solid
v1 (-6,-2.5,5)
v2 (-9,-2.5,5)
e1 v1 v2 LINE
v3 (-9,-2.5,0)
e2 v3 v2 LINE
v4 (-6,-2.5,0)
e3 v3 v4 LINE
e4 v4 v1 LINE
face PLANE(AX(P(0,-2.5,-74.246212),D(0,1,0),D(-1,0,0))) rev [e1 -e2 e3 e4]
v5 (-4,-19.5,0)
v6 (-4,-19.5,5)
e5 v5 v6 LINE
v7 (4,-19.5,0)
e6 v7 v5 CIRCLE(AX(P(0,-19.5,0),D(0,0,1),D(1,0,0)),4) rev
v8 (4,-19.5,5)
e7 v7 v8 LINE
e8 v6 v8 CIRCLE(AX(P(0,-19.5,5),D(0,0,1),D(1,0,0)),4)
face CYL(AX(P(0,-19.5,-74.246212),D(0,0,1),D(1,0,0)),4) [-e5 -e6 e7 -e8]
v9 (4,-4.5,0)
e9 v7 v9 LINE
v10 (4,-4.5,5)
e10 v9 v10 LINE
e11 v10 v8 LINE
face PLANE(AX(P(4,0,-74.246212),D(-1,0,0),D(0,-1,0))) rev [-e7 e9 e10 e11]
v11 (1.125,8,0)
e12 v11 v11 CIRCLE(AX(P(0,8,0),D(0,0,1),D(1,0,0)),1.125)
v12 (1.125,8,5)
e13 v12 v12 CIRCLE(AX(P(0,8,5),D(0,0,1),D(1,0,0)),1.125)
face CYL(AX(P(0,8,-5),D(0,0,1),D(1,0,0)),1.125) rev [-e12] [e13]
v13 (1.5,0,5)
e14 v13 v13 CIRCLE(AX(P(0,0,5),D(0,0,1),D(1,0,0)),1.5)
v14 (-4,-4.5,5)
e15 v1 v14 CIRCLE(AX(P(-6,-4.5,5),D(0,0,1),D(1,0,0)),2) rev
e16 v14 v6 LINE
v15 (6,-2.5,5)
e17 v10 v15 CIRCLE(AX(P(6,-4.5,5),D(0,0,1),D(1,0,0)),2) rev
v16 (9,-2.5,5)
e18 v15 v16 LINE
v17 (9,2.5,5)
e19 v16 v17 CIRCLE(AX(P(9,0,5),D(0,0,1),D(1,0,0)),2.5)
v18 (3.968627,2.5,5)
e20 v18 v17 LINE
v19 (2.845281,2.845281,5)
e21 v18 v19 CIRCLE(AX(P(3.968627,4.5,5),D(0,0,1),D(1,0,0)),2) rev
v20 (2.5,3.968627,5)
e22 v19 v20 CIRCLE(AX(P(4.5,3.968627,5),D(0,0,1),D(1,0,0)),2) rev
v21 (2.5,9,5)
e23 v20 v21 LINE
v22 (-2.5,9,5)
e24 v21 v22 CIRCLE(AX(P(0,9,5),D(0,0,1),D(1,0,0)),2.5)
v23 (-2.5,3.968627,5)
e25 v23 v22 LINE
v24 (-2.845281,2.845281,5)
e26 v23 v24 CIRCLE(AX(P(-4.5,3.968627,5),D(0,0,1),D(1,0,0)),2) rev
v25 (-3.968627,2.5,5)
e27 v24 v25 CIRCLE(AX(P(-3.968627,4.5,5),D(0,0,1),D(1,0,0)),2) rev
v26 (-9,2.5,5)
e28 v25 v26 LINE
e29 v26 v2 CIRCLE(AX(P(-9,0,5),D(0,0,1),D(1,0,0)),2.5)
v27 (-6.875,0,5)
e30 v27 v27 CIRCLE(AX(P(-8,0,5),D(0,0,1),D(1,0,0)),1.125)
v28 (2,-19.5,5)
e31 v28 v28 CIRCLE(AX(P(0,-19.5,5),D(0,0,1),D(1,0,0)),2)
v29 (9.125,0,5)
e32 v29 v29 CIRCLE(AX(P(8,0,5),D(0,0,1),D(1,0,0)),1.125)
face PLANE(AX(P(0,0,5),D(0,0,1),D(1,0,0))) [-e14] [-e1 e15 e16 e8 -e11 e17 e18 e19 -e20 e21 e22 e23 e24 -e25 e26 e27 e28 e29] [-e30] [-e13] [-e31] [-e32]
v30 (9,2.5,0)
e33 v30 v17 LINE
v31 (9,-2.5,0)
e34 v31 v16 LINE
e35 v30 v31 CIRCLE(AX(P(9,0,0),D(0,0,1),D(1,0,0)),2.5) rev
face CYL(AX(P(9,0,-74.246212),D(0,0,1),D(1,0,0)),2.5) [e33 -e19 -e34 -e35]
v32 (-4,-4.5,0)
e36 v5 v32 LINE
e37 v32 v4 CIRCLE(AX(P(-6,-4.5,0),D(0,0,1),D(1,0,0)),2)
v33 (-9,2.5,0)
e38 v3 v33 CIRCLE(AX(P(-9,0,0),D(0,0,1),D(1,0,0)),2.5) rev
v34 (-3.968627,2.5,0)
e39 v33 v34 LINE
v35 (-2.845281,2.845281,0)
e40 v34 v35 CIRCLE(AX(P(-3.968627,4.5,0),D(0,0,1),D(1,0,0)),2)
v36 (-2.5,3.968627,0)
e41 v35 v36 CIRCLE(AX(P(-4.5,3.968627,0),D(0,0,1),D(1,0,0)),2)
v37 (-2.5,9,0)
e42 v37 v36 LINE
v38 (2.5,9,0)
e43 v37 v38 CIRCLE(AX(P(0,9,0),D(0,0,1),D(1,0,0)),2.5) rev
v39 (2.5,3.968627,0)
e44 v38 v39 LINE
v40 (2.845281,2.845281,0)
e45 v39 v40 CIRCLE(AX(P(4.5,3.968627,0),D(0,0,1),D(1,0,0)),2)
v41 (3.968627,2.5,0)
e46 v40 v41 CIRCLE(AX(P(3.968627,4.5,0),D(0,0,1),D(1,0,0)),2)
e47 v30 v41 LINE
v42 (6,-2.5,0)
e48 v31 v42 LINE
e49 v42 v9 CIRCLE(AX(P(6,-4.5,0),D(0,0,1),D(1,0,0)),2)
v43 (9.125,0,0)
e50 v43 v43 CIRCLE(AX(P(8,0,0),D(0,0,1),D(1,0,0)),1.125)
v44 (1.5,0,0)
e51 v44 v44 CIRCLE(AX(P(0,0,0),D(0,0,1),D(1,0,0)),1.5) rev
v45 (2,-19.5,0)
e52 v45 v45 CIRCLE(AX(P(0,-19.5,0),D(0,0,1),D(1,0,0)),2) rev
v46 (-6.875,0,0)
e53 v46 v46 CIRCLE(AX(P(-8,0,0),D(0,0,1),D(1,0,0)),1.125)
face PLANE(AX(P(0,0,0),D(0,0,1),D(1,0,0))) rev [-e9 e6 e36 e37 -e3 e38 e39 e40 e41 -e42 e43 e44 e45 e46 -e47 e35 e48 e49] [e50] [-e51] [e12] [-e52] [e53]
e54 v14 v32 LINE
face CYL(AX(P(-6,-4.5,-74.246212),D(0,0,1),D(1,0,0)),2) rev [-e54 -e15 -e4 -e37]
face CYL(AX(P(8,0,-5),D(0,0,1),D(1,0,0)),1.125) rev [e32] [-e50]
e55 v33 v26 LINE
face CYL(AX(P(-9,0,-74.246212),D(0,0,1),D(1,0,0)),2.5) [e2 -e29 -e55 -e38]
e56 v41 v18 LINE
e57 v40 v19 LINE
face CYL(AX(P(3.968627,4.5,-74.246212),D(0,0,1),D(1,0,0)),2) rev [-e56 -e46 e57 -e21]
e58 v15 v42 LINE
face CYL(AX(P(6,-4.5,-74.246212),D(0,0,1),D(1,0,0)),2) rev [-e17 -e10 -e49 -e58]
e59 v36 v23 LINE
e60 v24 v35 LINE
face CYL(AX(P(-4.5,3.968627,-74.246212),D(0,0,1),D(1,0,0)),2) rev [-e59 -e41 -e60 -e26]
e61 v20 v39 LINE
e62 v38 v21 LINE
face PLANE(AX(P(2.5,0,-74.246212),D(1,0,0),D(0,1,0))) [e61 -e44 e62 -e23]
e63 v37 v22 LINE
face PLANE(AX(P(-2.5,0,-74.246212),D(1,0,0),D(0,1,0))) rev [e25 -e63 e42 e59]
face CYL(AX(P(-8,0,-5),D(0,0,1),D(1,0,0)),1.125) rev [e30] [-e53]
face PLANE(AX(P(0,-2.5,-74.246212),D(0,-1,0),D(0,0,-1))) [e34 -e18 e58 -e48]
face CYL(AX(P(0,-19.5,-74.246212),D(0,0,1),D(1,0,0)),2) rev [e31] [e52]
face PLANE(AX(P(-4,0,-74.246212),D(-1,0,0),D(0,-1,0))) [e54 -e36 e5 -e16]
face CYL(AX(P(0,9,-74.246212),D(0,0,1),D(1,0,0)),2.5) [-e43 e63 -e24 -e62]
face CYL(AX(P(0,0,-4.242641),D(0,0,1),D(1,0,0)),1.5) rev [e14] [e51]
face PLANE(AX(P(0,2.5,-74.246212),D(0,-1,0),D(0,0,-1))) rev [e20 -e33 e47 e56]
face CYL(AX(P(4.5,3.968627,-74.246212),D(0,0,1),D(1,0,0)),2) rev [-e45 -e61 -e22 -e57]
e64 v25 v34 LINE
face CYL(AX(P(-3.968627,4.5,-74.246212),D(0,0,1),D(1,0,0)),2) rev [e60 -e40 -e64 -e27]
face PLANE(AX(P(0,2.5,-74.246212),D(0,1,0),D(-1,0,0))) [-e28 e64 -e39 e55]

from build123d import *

# Parameters (mm, degrees)
ESQUISSE1_R             = 26.25
BOSS_EXTRU_1_DEPTH      = 5
ESQUISSE2_R             = 1.5
ENL_V_MAT_EXTRU_1_DEPTH = 5
ENL_V_START             = -5
ESQUISSE3_R             = 26.25
ESQUISSE3_R_2           = 2
ENL_V_MAT_EXTRU_2_DEPTH = 5
CONG_1_R                = 2
ESQUISSE4_R             = 1.125
ENL_V_MAT_EXTRU_3_DEPTH = 10


with BuildPart() as part:
    # Esquisse1 → Boss.-Extru.1 (new body)
    with BuildSketch(Plane.XY):
        Circle(ESQUISSE1_R)
    extrude(amount=BOSS_EXTRU_1_DEPTH)

    # Esquisse2 → Enlèv. mat.-Extru.1 (cut)
    with BuildSketch(Plane.XY.offset(5)):
        Circle(ESQUISSE2_R)
    extrude(amount=-ENL_V_MAT_EXTRU_1_DEPTH, mode=Mode.SUBTRACT)

    # Esquisse3 → Enlèv. mat.-Extru.2 (cut)
    # profile 1 of 2: a face of its own
    with BuildSketch(Plane.XY.offset(5).offset(ENL_V_START)):
        Circle(ESQUISSE3_R)
        with BuildLine():
            Line((9, -2.5), (4, -2.5))
            Line((4, -2.5), (4, -19.5))
            ThreePointArc((4, -19.5), (0, -23.5), (-4, -19.5))
            Line((-4, -19.5), (-4, -2.5))
            Line((-4, -2.5), (-9, -2.5))
            ThreePointArc((-9, -2.5), (-11.5, 0), (-9, 2.5))
            Line((-9, 2.5), (-3.122498999, 2.5))
            ThreePointArc((-3.122498999, 2.5), (-2.828427125, 2.828427125), (-2.5, 3.122498999))
            Line((-2.5, 3.122498999), (-2.5, 9))
            ThreePointArc((-2.5, 9), (0, 11.5), (2.5, 9))
            Line((2.5, 9), (2.5, 3.122498999))
            ThreePointArc((2.5, 3.122498999), (2.828427125, 2.828427125), (3.122498999, 2.5))
            Line((3.122498999, 2.5), (9, 2.5))
            ThreePointArc((9, 2.5), (11.5, 0), (9, -2.5))
        make_face(mode=Mode.SUBTRACT)
    # profile 2 of 2: a face of its own
    with BuildSketch(Plane.XY.offset(5).offset(ENL_V_START)):
        with Locations((0, -19.5)):
            Circle(ESQUISSE3_R_2)
    extrude(amount=ENL_V_MAT_EXTRU_2_DEPTH, mode=Mode.SUBTRACT)

    # Congé1
    # the kernel refuses this fillet: 2 mm, written as the material it adds along each edge
    with BuildSketch(Plane(origin=(-4, -2.5, 0), x_dir=(0, -1, 0), z_dir=(0, 0, 1)), Plane(origin=(4, -2.5, 0), x_dir=(1, 0, 0), z_dir=(0, 0, 1))) as cong_1_piece_1:
        with BuildLine():
            CenterArc((CONG_1_R, -CONG_1_R), CONG_1_R, 90, 90)
            Line((0, -CONG_1_R), (0, 0))
            Line((0, 0), (CONG_1_R, 0))
        make_face()
    extrude(amount=5)
    with BuildSketch(Plane(origin=(-3.122498999, 2.5, 0), x_dir=(-1, 0, 0), z_dir=(0, 0, 1))) as cong_1_piece_2:
        with BuildLine():
            CenterArc((0.846127967, -2), CONG_1_R, 90, 41.409622109)
            ThreePointArc((-0.476747688, -0.5), (-0.227558946, -0.260311955), (0, 0))
            Line((0, 0), (0.846127967, 0))
        make_face()
    extrude(amount=5)
    with BuildSketch(Plane(origin=(-2.5, 3.122498999, 0), x_dir=(-0.7237350132500174, -0.6900779887780779, 0), z_dir=(0, 0, 1)), Plane(origin=(3.122498999, 2.5, 0), x_dir=(-0.6900779887780603, 0.7237350132500343, 0), z_dir=(0, 0, 1))) as cong_1_piece_3:
        with BuildLine():
            CenterArc((0.863575741, -1.992528413), CONG_1_R, 94.954095219, 41.409622109)
            Line((-0.583894286, -0.612372436), (0, 0))
            ThreePointArc((0, 0), (0.345430296, -0.014943173), (0.690860592, 0))
        make_face()
    extrude(amount=5)
    with BuildSketch(Plane(origin=(2.5, 3.122498999, 0), x_dir=(0.7237350132500171, -0.6900779887780782, 0), z_dir=(0, 0, 1))) as cong_1_piece_4:
        with BuildLine():
            CenterArc((0.863575741, 1.992528413), CONG_1_R, 223.636282672, 41.409622109)
            Line((-0.583894286, 0.612372436), (0, 0))
            ThreePointArc((0, 0), (0.345430296, 0.014943173), (0.690860592, 0))
        make_face()
    extrude(amount=5)

    # Esquisse4 → Enlèv. mat.-Extru.3 (cut)
    with BuildSketch(Plane.XY.offset(5)):
        with Locations((-8, 0)):
            Circle(ESQUISSE4_R)
        with Locations((8, 0)):
            Circle(ESQUISSE4_R)
        with Locations((0, 8)):
            Circle(ESQUISSE4_R)
    extrude(amount=-ENL_V_MAT_EXTRU_3_DEPTH, mode=Mode.SUBTRACT)


solid = part.part
